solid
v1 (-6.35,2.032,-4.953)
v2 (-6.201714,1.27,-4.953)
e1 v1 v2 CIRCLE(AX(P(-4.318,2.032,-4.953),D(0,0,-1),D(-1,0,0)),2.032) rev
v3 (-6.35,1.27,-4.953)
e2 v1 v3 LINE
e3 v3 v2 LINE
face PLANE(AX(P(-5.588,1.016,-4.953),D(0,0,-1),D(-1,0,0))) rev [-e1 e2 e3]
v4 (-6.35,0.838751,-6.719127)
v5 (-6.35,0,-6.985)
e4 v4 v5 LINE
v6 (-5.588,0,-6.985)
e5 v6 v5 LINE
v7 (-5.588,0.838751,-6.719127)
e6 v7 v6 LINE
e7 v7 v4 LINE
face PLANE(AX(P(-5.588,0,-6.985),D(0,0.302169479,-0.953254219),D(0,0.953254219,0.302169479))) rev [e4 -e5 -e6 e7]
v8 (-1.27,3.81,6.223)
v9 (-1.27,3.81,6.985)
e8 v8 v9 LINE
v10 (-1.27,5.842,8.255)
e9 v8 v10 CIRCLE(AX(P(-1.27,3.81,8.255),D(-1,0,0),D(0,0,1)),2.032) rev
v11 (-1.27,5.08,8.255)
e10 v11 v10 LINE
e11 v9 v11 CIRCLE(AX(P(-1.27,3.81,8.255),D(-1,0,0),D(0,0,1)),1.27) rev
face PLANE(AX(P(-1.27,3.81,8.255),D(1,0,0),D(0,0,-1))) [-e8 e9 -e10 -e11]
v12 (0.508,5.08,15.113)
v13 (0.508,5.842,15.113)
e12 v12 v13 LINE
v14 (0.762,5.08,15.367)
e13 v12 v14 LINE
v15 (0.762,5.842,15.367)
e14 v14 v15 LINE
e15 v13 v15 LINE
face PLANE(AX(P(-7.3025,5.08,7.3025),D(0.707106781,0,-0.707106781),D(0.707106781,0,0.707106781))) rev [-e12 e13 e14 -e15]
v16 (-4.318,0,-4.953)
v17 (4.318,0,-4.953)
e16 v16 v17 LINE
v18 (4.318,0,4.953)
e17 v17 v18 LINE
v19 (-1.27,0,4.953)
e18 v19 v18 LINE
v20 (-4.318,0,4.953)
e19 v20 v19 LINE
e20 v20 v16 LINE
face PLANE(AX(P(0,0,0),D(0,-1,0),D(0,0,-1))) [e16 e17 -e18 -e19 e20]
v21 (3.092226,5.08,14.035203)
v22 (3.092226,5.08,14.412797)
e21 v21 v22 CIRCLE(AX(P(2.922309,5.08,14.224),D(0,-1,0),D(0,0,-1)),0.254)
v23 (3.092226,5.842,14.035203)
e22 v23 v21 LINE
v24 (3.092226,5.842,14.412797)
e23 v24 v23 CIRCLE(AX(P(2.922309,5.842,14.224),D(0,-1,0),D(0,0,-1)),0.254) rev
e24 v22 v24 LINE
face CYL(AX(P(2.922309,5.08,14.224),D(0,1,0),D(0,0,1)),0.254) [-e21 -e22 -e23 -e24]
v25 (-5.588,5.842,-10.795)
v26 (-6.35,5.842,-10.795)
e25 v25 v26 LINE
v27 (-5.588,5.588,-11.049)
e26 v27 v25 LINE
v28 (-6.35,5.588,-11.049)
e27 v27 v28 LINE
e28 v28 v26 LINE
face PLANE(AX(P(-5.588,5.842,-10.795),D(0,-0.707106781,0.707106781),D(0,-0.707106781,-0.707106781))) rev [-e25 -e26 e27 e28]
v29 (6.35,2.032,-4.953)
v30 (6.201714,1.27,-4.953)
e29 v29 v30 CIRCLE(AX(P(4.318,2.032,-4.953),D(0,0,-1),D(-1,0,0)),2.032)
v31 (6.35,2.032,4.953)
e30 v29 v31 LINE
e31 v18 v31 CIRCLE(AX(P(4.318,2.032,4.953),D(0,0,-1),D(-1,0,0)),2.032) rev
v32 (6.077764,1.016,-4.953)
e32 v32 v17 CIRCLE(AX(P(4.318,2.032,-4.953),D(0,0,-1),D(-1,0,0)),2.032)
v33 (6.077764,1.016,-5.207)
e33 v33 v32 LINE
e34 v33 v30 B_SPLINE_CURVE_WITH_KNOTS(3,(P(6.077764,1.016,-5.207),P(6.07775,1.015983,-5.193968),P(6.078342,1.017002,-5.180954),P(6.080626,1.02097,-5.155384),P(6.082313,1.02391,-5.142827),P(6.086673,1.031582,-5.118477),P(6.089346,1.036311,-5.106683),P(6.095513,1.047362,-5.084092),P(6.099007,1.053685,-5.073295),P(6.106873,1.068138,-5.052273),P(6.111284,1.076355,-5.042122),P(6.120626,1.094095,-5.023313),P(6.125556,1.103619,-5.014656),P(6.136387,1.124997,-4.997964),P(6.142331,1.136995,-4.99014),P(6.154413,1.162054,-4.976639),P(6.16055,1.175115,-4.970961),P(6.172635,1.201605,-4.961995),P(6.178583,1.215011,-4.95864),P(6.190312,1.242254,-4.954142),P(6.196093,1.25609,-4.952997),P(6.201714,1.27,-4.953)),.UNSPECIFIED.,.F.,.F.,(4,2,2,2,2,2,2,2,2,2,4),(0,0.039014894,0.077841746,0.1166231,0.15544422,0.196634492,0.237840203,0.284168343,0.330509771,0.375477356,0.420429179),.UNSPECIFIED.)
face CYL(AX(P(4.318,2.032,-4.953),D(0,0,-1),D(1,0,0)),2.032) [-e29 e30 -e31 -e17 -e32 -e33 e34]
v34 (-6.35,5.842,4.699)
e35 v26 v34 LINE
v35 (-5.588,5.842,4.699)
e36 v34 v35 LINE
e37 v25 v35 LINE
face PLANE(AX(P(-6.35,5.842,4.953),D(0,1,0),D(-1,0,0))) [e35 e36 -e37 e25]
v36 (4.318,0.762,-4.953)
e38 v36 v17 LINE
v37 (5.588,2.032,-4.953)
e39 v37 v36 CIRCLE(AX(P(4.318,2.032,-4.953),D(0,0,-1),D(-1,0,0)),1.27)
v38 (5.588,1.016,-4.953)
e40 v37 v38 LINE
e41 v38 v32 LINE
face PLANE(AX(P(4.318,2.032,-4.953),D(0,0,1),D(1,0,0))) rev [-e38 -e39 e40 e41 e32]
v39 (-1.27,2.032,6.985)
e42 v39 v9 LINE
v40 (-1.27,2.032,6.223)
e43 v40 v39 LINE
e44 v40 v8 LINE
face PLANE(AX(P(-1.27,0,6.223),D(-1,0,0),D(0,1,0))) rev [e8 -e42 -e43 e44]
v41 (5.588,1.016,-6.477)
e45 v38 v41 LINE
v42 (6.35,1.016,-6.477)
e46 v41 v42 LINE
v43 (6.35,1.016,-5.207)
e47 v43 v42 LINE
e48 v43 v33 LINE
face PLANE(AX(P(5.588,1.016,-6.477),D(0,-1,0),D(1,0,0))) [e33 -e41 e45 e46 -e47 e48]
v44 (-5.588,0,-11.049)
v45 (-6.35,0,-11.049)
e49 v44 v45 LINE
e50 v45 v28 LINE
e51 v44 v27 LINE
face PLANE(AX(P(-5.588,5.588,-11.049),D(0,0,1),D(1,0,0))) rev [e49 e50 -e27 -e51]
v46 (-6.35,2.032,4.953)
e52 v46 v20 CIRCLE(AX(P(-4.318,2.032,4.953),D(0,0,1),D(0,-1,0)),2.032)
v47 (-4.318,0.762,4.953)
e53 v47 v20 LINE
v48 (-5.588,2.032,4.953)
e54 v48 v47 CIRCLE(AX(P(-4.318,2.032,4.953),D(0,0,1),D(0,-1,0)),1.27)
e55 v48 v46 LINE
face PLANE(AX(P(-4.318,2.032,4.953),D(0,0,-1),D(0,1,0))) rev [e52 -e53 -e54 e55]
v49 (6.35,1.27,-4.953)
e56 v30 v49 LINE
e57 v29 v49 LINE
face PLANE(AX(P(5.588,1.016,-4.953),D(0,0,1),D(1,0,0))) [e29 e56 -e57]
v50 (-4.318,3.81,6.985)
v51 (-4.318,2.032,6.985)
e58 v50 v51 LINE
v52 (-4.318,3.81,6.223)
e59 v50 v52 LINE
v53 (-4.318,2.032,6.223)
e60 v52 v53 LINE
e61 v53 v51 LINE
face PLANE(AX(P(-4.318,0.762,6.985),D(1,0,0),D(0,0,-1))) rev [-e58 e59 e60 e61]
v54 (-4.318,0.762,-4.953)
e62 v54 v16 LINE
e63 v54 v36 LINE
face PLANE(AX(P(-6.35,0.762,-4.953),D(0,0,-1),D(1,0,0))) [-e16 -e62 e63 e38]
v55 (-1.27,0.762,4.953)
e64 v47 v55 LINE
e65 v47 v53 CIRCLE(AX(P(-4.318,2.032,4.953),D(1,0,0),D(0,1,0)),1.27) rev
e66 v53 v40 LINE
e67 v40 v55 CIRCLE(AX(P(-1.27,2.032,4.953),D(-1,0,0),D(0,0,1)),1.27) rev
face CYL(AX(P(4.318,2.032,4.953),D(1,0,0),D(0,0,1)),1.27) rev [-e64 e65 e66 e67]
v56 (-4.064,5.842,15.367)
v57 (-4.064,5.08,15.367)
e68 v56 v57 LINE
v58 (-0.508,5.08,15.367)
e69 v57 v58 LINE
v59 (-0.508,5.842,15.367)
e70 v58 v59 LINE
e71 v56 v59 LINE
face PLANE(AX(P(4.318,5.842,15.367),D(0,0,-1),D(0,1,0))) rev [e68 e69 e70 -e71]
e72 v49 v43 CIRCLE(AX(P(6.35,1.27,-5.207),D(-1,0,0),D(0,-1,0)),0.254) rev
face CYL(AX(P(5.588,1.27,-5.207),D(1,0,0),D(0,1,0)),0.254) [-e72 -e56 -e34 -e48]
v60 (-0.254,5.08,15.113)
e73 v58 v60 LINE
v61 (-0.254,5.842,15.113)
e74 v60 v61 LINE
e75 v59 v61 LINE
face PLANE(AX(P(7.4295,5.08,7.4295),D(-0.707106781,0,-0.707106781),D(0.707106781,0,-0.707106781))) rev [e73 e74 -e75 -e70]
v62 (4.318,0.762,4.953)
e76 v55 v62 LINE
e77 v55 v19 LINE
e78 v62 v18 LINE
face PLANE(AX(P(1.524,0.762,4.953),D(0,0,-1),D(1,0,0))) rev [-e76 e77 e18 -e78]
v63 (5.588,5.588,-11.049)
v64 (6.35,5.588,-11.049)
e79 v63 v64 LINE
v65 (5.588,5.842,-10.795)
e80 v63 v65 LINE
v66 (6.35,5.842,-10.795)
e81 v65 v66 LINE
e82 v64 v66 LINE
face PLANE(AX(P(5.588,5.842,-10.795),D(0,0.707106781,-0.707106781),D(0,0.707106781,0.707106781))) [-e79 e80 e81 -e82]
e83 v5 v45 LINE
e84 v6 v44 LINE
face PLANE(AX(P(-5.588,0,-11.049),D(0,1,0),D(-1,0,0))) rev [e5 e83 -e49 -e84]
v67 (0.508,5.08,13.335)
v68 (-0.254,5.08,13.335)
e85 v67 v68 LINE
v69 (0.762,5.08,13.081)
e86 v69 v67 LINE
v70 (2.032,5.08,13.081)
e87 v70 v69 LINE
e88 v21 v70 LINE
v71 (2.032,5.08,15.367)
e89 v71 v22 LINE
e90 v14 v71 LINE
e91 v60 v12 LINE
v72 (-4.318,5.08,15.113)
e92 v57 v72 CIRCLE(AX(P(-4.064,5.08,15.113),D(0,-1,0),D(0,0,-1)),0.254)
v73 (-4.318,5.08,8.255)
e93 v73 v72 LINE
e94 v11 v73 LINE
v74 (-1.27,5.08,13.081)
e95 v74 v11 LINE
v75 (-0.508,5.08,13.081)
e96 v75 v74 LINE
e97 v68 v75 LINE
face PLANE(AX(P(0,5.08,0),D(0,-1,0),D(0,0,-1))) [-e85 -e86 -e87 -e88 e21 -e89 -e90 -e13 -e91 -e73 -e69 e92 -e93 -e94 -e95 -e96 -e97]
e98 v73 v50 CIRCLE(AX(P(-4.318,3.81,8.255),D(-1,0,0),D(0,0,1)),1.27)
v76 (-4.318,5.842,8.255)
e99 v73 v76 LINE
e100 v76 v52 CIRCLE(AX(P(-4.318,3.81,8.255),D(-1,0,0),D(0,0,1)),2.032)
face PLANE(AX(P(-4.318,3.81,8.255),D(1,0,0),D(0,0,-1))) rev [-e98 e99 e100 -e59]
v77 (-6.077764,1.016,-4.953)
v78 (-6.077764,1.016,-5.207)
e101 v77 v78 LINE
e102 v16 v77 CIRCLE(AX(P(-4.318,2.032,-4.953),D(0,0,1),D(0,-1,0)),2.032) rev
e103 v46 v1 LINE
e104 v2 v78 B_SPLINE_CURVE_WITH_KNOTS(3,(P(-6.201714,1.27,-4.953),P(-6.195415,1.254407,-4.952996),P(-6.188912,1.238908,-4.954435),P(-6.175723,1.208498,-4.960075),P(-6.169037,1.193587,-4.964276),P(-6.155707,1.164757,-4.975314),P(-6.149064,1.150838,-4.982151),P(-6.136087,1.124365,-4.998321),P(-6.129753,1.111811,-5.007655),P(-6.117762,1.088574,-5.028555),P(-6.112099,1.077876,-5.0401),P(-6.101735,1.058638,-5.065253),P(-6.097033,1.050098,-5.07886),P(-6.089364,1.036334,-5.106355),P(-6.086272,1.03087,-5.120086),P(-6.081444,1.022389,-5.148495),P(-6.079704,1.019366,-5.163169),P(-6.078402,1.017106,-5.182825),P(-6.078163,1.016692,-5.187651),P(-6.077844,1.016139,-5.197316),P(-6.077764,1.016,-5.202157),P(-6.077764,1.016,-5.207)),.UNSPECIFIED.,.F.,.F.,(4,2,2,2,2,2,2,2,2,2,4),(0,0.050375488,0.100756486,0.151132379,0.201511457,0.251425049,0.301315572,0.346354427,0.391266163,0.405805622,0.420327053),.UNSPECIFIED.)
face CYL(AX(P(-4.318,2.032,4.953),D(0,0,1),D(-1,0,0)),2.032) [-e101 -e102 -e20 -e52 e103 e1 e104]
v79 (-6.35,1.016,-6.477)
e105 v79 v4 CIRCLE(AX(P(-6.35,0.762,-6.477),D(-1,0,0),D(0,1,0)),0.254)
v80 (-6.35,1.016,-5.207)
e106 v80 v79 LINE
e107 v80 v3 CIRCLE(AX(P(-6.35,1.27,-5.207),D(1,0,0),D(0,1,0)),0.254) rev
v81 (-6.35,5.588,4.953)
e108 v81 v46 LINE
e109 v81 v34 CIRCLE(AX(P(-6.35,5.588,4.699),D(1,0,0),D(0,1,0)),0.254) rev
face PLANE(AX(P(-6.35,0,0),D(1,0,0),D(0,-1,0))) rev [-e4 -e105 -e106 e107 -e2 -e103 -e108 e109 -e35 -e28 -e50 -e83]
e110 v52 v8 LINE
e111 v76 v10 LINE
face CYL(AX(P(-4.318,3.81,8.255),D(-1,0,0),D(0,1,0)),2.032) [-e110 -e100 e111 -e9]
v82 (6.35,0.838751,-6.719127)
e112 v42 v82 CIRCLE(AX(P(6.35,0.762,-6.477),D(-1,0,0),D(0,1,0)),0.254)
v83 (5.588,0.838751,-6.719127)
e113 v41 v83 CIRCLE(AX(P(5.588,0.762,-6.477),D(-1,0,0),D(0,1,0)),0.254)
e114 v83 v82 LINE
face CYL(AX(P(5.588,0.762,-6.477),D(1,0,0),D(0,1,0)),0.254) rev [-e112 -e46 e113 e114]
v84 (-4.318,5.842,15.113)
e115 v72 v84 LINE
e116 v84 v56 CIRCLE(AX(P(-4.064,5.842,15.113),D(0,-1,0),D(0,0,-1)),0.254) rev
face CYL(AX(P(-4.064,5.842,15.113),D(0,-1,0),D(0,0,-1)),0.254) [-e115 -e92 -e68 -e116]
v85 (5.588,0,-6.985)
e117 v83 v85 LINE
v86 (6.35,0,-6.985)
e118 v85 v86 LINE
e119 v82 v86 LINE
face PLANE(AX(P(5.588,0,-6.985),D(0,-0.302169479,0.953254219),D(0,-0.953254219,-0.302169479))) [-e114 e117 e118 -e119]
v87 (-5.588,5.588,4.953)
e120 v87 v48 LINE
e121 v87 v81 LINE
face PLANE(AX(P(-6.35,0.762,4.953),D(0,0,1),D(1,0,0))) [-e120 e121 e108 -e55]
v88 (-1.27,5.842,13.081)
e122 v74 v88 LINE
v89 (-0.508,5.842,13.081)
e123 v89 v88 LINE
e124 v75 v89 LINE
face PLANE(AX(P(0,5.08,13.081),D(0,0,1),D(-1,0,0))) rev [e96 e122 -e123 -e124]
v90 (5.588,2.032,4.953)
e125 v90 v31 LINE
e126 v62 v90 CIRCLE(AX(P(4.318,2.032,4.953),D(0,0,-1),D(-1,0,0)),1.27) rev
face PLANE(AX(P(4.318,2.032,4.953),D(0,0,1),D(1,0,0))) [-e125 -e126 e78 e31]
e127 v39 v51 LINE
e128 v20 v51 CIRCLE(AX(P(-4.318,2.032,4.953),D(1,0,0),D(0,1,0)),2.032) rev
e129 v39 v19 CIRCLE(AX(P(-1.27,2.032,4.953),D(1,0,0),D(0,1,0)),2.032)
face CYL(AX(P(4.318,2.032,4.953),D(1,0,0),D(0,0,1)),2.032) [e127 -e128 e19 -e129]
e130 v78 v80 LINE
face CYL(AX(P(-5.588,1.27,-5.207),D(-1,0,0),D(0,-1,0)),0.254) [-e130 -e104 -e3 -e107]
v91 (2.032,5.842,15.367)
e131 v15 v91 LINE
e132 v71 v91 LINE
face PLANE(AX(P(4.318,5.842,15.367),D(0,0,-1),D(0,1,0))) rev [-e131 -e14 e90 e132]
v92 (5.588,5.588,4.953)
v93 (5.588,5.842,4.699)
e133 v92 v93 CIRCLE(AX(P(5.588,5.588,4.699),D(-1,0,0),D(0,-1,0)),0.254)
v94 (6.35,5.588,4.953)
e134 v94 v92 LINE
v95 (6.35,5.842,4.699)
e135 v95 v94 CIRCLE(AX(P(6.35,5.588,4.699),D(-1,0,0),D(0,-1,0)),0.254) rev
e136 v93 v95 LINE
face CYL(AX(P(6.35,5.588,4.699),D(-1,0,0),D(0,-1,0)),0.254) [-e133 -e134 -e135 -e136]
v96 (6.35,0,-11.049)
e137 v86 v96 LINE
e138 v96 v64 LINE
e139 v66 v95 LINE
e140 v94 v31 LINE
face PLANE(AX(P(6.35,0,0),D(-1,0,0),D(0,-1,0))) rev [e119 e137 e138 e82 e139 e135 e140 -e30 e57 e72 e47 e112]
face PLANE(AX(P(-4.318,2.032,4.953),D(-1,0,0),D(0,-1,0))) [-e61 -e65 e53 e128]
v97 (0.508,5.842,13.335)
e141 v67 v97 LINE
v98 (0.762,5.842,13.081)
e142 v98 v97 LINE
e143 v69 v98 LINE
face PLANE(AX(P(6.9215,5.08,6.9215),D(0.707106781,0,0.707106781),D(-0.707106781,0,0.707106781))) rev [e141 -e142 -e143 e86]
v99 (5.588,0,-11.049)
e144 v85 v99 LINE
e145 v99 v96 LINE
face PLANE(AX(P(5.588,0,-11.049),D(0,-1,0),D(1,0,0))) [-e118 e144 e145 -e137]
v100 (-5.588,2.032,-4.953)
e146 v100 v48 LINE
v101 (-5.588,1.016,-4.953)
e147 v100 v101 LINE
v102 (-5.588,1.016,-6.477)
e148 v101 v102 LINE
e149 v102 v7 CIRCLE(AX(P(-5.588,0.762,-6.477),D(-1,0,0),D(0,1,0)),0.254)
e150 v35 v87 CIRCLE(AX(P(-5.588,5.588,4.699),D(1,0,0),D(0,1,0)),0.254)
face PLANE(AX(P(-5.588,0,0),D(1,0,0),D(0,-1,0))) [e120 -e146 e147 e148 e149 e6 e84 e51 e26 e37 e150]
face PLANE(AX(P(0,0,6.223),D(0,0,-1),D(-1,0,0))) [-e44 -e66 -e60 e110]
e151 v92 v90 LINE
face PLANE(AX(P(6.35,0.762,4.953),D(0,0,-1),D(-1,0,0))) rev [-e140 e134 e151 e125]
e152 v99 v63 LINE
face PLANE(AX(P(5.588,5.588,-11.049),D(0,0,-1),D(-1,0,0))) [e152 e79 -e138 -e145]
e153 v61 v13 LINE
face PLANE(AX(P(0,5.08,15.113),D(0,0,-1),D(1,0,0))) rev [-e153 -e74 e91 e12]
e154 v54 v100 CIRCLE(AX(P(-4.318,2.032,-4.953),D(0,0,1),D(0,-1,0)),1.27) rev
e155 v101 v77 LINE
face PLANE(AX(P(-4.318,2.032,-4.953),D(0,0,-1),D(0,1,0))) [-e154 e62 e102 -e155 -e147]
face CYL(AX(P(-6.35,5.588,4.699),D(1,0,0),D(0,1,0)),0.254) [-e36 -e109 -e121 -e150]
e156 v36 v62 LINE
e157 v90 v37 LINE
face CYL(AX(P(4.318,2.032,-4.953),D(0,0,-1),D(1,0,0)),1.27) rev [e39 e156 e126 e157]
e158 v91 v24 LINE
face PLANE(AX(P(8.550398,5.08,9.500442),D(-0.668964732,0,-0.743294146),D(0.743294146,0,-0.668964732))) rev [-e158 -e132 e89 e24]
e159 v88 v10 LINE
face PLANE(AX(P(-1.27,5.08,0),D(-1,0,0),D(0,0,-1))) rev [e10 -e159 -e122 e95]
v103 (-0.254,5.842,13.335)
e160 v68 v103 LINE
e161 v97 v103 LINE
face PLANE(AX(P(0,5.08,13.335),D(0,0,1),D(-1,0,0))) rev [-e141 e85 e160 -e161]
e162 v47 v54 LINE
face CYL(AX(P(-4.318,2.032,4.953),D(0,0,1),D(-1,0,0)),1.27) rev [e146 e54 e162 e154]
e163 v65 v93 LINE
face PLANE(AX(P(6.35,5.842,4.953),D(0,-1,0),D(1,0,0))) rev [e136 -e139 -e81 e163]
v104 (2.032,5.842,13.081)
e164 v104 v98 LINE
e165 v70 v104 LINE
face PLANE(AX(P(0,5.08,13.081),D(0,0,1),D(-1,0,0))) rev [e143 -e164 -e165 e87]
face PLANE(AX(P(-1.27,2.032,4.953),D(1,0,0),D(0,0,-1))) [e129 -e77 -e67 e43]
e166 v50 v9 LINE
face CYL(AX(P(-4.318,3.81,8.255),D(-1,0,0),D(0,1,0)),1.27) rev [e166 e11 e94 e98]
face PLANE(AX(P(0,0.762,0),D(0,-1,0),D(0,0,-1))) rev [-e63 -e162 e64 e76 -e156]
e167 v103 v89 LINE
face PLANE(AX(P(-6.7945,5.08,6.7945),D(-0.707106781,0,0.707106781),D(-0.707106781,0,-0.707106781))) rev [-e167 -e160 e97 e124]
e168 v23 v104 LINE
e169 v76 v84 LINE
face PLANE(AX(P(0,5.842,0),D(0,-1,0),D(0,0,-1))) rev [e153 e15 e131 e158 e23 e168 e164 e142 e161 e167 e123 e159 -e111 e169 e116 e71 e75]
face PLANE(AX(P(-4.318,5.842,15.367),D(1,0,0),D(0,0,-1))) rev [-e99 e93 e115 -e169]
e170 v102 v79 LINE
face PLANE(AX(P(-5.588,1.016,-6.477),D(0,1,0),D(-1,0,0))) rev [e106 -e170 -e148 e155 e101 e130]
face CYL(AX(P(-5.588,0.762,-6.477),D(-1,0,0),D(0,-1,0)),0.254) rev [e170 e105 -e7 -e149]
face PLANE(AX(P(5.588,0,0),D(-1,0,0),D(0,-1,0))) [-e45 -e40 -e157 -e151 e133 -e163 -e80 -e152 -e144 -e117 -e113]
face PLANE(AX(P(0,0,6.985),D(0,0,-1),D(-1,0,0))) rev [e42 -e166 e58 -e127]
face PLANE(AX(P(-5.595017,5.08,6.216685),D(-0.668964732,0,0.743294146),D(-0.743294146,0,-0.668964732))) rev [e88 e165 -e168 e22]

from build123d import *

# Parameters (mm, degrees)
SKETCH1_W                    = 12.7
SKETCH1_H                    = 9.906
BOSS_EXTRUDE1_DEPTH          = 0.762
EDGE_FLANGE1_STRIP_W         = 5.588
EDGE_FLANGE1_STRIP_H         = 0.762
EDGE_FLANGE1_STRIP_CUT_DEPTH = 9.906
EDGE_FLANGE1_DEPTH           = 9.906
TAB1_DEPTH                   = 0.762
EDGE_FLANGE2_DEPTH           = 8.636
EDGE_FLANGE3_STRIP_W         = 5.588
EDGE_FLANGE3_STRIP_H         = 0.762
EDGE_FLANGE3_STRIP_CUT_DEPTH = 8.636
EDGE_FLANGE3_DEPTH           = 8.636
CUT_EXTRUDE1_DEPTH           = 18.623738338
FILLET1_R                    = 0.254
FILLET2_R                    = 0.254
FILLET3_R                    = 0.254


# Sheet-metal steps are written as plain solids
with BuildPart() as part:
    # Sketch1 → Boss-Extrude1 (new body)
    with BuildSketch(Plane(origin=(0, 0, 0), x_dir=(1, 0, 0), z_dir=(0, 1, 0))):
        Rectangle(SKETCH1_W, SKETCH1_H)
    extrude(amount=BOSS_EXTRUDE1_DEPTH)

    # Edge-Flange1 strip (across the edge) → Edge-Flange1 strip cut (cut)
    with BuildSketch(Plane(origin=(6.35, 0.762, 4.953), x_dir=(-1, 0, 0), z_dir=(0, 0, -1))):
        with Locations((-0.762, -0.381)):
            Rectangle(EDGE_FLANGE1_STRIP_W, EDGE_FLANGE1_STRIP_H)
    edge_flange1_strip_cut = extrude(amount=EDGE_FLANGE1_STRIP_CUT_DEPTH, mode=Mode.SUBTRACT)

    # Edge-Flange1 section (across the edge) → Edge-Flange1 (add)
    with BuildSketch(Plane(origin=(6.35, 0.762, 4.953), x_dir=(-1, 0, 0), z_dir=(0, 0, -1))):
        with BuildLine():
            Line((0, 1.27), (0, 5.08))
            Line((0, 5.08), (0.762, 5.08))
            Line((0.762, 5.08), (0.762, 1.27))
            ThreePointArc((0.762, 1.27), (1.133974388, 0.371974388), (2.032, 0))
            Line((2.032, 0), (2.032, -0.762))
            ThreePointArc((2.032, -0.762), (0.595159021, -0.166840979), (0, 1.27))
        make_face()
    edge_flange1 = extrude(amount=EDGE_FLANGE1_DEPTH)

    # Sketch10 → Tab1 (add)
    with BuildSketch(Plane(origin=(6.35, 0, 0), x_dir=(0, 0, -1), z_dir=(1, 0, 0))):
        with BuildLine():
            Line((4.953, 5.842), (10.795, 5.842))
            Line((10.795, 5.842), (11.049, 5.588))
            Line((11.049, 5.588), (11.049, 0))
            Line((11.049, 0), (6.985, 0))
            Line((6.985, 0), (6.719126572, 0.838751048))
            ThreePointArc((6.719126572, 0.838751048), (6.627035386, 0.966952148), (6.477, 1.016))
            Line((6.477, 1.016), (4.953, 1.016))
            Line((4.953, 1.016), (4.953, 5.842))
        make_face()
    tab1 = extrude(amount=-TAB1_DEPTH)

    # Mirror1: Edge-Flange1 strip cut, Edge-Flange1, Tab1 across plane
    add(edge_flange1_strip_cut.mirror(Plane(origin=(0, 0, 0), x_dir=(0, 0, 1), z_dir=(1, 0, 0))), mode=Mode.SUBTRACT)
    add(edge_flange1.mirror(Plane(origin=(0, 0, 0), x_dir=(0, 0, 1), z_dir=(1, 0, 0))))
    add(tab1.mirror(Plane(origin=(0, 0, 0), x_dir=(0, 0, 1), z_dir=(1, 0, 0))))

    # Edge-Flange2 section (across the edge) → Edge-Flange2 (add)
    with BuildSketch(Plane(origin=(-4.318, 0.762, 6.223), x_dir=(0, 0, -1), z_dir=(1, 0, 0))):
        with BuildLine():
            Line((-0.762, 1.27), (-0.762, 5.08))
            Line((-0.762, 5.08), (0, 5.08))
            Line((0, 5.08), (0, 1.27))
            ThreePointArc((0, 1.27), (0.371974388, 0.371974388), (1.27, 0))
            Line((1.27, 0), (1.27, -0.762))
            ThreePointArc((1.27, -0.762), (-0.166840979, -0.166840979), (-0.762, 1.27))
        make_face()
    extrude(amount=EDGE_FLANGE2_DEPTH)

    # Edge-Flange3 strip (across the edge) → Edge-Flange3 strip cut (cut)
    with BuildSketch(Plane(origin=(4.318, 5.842, 6.985), x_dir=(0, -1, 0), z_dir=(-1, 0, 0))):
        with Locations((-0.762, -0.381)):
            Rectangle(EDGE_FLANGE3_STRIP_W, EDGE_FLANGE3_STRIP_H)
    extrude(amount=EDGE_FLANGE3_STRIP_CUT_DEPTH, mode=Mode.SUBTRACT)

    # Edge-Flange3 section (across the edge) → Edge-Flange3 (add)
    with BuildSketch(Plane(origin=(4.318, 5.842, 6.985), x_dir=(0, -1, 0), z_dir=(-1, 0, 0))):
        with BuildLine():
            Line((0, 1.27), (0, 8.382))
            Line((0, 8.382), (0.762, 8.382))
            Line((0.762, 8.382), (0.762, 1.27))
            ThreePointArc((0.762, 1.27), (1.133974388, 0.371974388), (2.032, 0))
            Line((2.032, 0), (2.032, -0.762))
            ThreePointArc((2.032, -0.762), (0.595159021, -0.166840979), (0, 1.27))
        make_face()
    extrude(amount=EDGE_FLANGE3_DEPTH)

    # Sketch24 → Cut-Extrude1 (cut, through all)
    with BuildSketch(Plane(origin=(0, 5.842, 0), x_dir=(1, 0, 0), z_dir=(0, 1, 0))):
        Polygon((4.318, -4.953), (-1.27, -4.953), (-1.27, -13.081), (-0.508, -13.081), (-0.254, -13.335), (0.508, -13.335), (0.762, -13.081), (2.032, -13.081), (3.302, -14.224), (2.032, -15.367), (4.318, -15.367), align=None)
        Polygon((-0.508, -15.367), (0.762, -15.367), (0.508, -15.113), (-0.254, -15.113), align=None)
    extrude(amount=-CUT_EXTRUDE1_DEPTH, mode=Mode.SUBTRACT)

    # Fillet1
    fillet1_edges = [part.edges().sort_by_distance(p)[0] for p in [
        (-4.318, 5.461, 15.367),
        (3.302, 5.461, 14.224),
    ]]
    fillet(fillet1_edges, radius=FILLET1_R)

    # Fillet2
    fillet2_edges = [part.edges().sort_by_distance(p)[0] for p in [
        (5.969, 5.842, 4.953),
        (-5.969, 5.842, 4.953),
    ]]
    fillet(fillet2_edges, radius=FILLET2_R)

    # Fillet3
    fillet3_edges = [part.edges().sort_by_distance(p)[0] for p in [
        (-6.21388181, 1.016, -4.953),
        (6.21388181, 1.016, -4.953),
    ]]
    fillet(fillet3_edges, radius=FILLET3_R)


solid = part.part
